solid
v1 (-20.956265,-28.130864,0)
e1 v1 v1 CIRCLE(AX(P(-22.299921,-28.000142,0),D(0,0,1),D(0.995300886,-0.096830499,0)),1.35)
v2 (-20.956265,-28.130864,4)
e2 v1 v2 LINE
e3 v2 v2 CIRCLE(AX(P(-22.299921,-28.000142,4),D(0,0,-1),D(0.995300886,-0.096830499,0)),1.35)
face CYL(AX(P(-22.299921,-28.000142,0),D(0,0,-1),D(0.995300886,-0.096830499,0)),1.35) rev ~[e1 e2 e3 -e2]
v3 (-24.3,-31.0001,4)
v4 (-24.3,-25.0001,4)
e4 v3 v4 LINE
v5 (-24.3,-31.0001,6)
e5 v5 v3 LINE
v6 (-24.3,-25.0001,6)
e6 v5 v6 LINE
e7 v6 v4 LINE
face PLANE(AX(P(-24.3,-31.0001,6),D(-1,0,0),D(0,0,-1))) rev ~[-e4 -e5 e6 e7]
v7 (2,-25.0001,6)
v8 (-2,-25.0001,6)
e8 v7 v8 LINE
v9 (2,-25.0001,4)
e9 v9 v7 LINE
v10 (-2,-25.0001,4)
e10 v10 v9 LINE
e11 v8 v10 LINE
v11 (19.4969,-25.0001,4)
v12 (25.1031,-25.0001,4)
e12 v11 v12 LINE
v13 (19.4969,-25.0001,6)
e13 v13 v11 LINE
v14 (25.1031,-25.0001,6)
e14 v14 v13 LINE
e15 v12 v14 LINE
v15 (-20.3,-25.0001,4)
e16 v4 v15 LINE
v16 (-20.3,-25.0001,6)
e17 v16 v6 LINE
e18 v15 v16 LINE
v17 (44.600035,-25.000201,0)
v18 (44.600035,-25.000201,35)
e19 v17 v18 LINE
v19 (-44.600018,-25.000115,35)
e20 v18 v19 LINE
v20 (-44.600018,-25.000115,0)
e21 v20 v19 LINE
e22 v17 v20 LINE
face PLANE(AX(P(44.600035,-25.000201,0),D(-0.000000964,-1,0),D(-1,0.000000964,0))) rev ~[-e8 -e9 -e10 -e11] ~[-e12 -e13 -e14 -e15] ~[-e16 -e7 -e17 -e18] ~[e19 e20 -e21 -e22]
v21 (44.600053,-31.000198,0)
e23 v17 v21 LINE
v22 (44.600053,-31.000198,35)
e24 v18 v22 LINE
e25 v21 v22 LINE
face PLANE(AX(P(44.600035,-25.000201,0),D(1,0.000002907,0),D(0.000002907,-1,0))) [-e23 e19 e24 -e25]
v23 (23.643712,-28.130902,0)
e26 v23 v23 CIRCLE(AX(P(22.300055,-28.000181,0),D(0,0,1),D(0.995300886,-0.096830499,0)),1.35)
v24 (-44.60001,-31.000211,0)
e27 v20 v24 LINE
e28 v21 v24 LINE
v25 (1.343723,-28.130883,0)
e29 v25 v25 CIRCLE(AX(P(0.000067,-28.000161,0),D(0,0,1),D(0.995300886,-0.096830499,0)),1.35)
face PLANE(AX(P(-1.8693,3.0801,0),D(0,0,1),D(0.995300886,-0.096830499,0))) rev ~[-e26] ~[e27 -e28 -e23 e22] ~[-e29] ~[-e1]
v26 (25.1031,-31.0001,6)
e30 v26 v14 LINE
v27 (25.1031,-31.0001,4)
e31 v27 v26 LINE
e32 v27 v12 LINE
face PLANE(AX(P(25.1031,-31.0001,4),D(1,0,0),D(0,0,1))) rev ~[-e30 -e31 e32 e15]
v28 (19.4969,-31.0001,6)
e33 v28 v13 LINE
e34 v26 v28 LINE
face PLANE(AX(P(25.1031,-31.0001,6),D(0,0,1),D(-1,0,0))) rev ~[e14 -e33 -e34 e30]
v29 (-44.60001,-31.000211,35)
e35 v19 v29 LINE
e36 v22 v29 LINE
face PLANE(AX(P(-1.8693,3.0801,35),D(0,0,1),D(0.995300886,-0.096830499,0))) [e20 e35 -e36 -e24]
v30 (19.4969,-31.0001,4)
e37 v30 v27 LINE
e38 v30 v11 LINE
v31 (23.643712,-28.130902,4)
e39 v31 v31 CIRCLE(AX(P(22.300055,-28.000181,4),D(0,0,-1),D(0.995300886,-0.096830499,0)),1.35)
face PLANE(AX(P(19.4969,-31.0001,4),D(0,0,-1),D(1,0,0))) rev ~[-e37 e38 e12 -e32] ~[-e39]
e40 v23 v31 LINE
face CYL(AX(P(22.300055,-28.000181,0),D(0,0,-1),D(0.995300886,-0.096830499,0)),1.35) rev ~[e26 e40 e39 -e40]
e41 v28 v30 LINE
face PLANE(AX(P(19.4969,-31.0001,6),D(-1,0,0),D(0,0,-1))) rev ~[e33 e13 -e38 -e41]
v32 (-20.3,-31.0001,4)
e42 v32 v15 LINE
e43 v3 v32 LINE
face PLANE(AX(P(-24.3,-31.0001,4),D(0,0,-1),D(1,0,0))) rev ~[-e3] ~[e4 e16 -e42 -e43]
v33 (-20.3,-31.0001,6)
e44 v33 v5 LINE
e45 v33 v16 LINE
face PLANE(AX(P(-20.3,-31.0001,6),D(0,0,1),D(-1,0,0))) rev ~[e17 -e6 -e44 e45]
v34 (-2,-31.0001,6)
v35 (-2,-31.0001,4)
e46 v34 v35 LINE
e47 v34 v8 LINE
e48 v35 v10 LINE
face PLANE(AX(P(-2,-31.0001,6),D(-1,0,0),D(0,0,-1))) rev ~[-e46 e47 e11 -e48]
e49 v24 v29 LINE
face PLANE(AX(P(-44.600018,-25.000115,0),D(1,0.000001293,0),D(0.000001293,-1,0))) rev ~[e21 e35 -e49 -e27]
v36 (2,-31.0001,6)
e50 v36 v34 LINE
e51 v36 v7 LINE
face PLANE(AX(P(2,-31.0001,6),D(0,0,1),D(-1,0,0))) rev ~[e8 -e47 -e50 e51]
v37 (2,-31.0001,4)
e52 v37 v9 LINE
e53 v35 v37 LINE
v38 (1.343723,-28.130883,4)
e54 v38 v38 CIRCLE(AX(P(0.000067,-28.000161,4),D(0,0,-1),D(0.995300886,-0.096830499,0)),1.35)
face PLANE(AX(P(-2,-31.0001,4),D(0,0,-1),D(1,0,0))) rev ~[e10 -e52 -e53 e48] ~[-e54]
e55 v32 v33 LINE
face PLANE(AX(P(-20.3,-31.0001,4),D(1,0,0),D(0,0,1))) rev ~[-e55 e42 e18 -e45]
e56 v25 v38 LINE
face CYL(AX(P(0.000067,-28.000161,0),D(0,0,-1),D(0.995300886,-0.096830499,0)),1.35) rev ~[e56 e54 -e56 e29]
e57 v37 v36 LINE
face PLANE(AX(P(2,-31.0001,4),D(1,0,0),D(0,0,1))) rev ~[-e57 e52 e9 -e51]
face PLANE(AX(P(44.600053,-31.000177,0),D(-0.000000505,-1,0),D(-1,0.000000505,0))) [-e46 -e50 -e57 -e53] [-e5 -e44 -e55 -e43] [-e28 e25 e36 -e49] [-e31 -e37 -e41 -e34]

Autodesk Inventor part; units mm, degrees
ref_plane "YZ Plane" through (0, 0, 0) normal (1, 0, 0) x (0, 1, 0)
ref_plane "XZ Plane" through (0, 0, 0) normal (0, 1, 0) x (-1, 0, 0)
ref_plane "XY Plane" through (0, 0, 0) normal (0, 0, 1) x (1, 0, 0)
ref_plane "작업 평면4" through (-1.8693, 3.0801, 0) normal (0, 0, 1) x (0.9953009, -0.0968305, 0)
sketch "스케치1" plane through (-1.8693, 3.0801, 0) normal (0, 0, 1) x (0.9953009, -0.0968305, 0)
  circle A0 centre (-22.7477, 22.8243) radius 1.35 projected
  circle A1 centre (-43.8827, -21.2142) radius 1.35 projected
  circle A2 centre (21.6428, 27.143) radius 1.35 projected
  circle A3 centre (4.8701, -30.7532) radius 1.35 projected
  circle A4 centre (27.0653, -28.5939) radius 1.35 projected
  circle A5 centre (-0.5524, 24.9836) radius 1.35 projected
  circle A6 centre (-46.013, 0.6824) radius 1.3956 projected
  circle A7 centre (48.7397, 9.9006) radius 1.35 projected
  circle A8 centre (-17.3251, -32.9125) radius 1.35 projected
  circle A9 centre (50.8699, -11.996) radius 1.35 projected
  line L0 (68.8179, -26.0788) -> (63.0972, 32.7232) projected
  line L1 (60.913, 34.5202) -> (-62.7034, 22.4938) projected
  line L2 (-64.5004, 20.3096) -> (-58.7796, -38.4925) projected
  line L3 (-56.5954, -40.2895) -> (67.021, -28.2631) projected
  circle A10 centre (-49.3569, -21.7468) radius 1.35 projected
  circle A11 centre (-29.5905, 2.2801) radius 1.35 projected
  circle A12 centre (-51.4871, 0.1498) radius 1.35 projected
  circle A13 centre (-27.4602, -19.6165) radius 1.35 projected
  circle A14 centre (-38.4085, -20.6817) radius 1.35 projected
  circle A15 centre (-40.5388, 1.215) radius 1.35 projected
  circle A16 centre (34.4475, -13.5937) radius 1.35 projected
  circle A17 centre (54.2138, 10.4332) radius 1.35 projected
  circle A18 centre (45.3958, -12.5285) radius 1.35 projected
  circle A19 centre (32.3172, 8.3029) radius 1.35 projected
  circle A20 centre (43.2655, 9.3681) radius 1.35 projected
  circle A21 centre (56.3441, -11.4634) radius 1.35 projected
  circle A22 centre (-22.7477, 22.8243) radius 1.35 projected
  circle A23 centre (-43.8827, -21.2142) radius 1.35 projected
  circle A24 centre (21.6428, 27.143) radius 1.35 projected
  circle A25 centre (4.8701, -30.7532) radius 1.35 projected
  circle A26 centre (27.0653, -28.5939) radius 1.35 projected
  circle A27 centre (-0.5524, 24.9836) radius 1.35 projected
  circle A28 centre (-46.013, 0.6824) radius 1.3956 projected
  circle A29 centre (48.7397, 9.9006) radius 1.35 projected
  circle A30 centre (-17.3251, -32.9125) radius 1.35 projected
  circle A31 centre (50.8699, -11.996) radius 1.35 projected
  line L4 (68.8179, -26.0788) -> (63.0972, 32.7232) projected
  line L5 (-56.5954, -40.2895) -> (67.021, -28.2631) projected
  line L6 (-64.5004, 20.3096) -> (-58.7796, -38.4925) projected
  line L7 (60.913, 34.5202) -> (-62.7034, 22.4938) projected
  circle A32 centre (-49.3569, -21.7468) radius 1.35 projected
  circle A33 centre (-29.5905, 2.2801) radius 1.35 projected
  circle A34 centre (-51.4871, 0.1498) radius 1.35 projected
  circle A35 centre (-27.4602, -19.6165) radius 1.35 projected
  circle A36 centre (-38.4085, -20.6817) radius 1.35 projected
  circle A37 centre (-40.5388, 1.215) radius 1.35 projected
  circle A38 centre (34.4475, -13.5937) radius 1.35 projected
  circle A39 centre (54.2138, 10.4332) radius 1.35 projected
  circle A40 centre (45.3958, -12.5285) radius 1.35 projected
  circle A41 centre (32.3172, 8.3029) radius 1.35 projected
  circle A42 centre (43.2655, 9.3681) radius 1.35 projected
  circle A43 centre (56.3441, -11.4634) radius 1.35 projected
  line L8 (48.97, -23.4487) -> (-39.8109, -32.0859) projected
  line L9 (-39.8109, -32.0859) -> (-39.2299, -38.0578) projected
  line L10 (55.5228, -28.8395) -> (-45.2017, -38.6387) projected
  circle A44 centre (-17.3251, -32.9125) radius 1.35 projected
  circle A45 centre (4.8701, -30.7532) radius 1.35 projected
  circle A46 centre (27.0653, -28.5939) radius 1.35 projected
  line L11 (48.97, -23.4487) -> (-39.8109, -32.0859) projected
  line L12 (48.97, -23.4487) -> (49.551, -29.4205) projected
  circle A47 centre (-26.4824, -26.5694) radius 1.6 projected
  circle A48 centre (34.8281, -20.6047) radius 1.6 projected
  circle A49 centre (-30.5105, 14.8351) radius 1.6 projected
  circle A50 centre (30.8, 20.7999) radius 1.6 projected
  circle A51 centre (-26.4824, -26.5694) radius 1.6 projected
  circle A52 centre (34.8281, -20.6047) radius 1.6 projected
  circle A53 centre (-30.5105, 14.8351) radius 1.6 projected
  circle A54 centre (30.8, 20.7999) radius 1.6 projected
  arc A55 (67.021, -28.2631) -> (68.8179, -26.0788) centre (66.8273, -26.2725) ccw projected
  arc A56 (63.0972, 32.7232) -> (60.913, 34.5202) centre (61.1066, 32.5296) ccw projected
  arc A57 (-62.7034, 22.4938) -> (-64.5004, 20.3096) centre (-62.5098, 20.5032) ccw projected
  arc A58 (-58.7796, -38.4925) -> (-56.5954, -40.2895) centre (-56.789, -38.2989) ccw projected
  arc A59 (67.021, -28.2631) -> (68.8179, -26.0788) centre (66.8273, -26.2725) ccw projected
  arc A60 (-58.7796, -38.4925) -> (-56.5954, -40.2895) centre (-56.789, -38.2989) ccw projected
  arc A61 (-62.7034, 22.4938) -> (-64.5004, 20.3096) centre (-62.5098, 20.5032) ccw projected
  arc A62 (63.0972, 32.7232) -> (60.913, 34.5202) centre (61.1066, 32.5296) ccw projected
  point P0 (2.1588, -2.8846)
  point P1 (69.0116, -28.0694)
  point P2 (62.9036, 34.7138)
  point P3 (-64.694, 22.3002)
  point P4 (-58.586, -40.4831)
extrude "돌출1" add sketch "스케치1" along normal blind 35 contours L12 L10 L9 L8
sketch "스케치2" plane through (-1.8693, 3.0801, 35) normal (0, 0, 1) x (0.9953009, -0.0968305, 0)
  circle A0 centre (-17.3251, -32.9125) radius 1.35 projected
  circle A1 centre (4.8701, -30.7532) radius 1.35 projected
  circle A2 centre (27.0653, -28.5939) radius 1.35 projected
  point P0 (2.1588, -2.8846)
extrude "돌출2" add sketch "스케치2" against normal blind 30
ref_plane "작업 평면3" through (-44.6, -31.0001, 0) normal (0, -1, 0) x (1, 0, 0)
sketch "스케치3" plane through (-44.6, -31.0001, 0) normal (0, -1, 0) x (1, 0, 0)
  line L0 (45.95, 5) -> (43.25, 5) projected
  line L1 (68.25, 5) -> (65.55, 5) projected
  line L2 (23.65, 5) -> (20.95, 5) projected
  line L3 (64.0969, 4) -> (69.7031, 4)
  line L4 (69.7031, 4) -> (69.7031, 6)
  line L5 (69.7031, 6) -> (64.0969, 6)
  line L6 (64.0969, 6) -> (64.0969, 4)
  line L7 (64.0969, 4) -> (69.7031, 6) construction
  line L8 (69.7031, 4) -> (64.0969, 6) construction
  line L9 (42.6, 4) -> (46.6, 4)
  line L10 (46.6, 4) -> (46.6, 6)
  line L11 (46.6, 6) -> (42.6, 6)
  line L12 (42.6, 6) -> (42.6, 4)
  line L13 (42.6, 4) -> (46.6, 6) construction
  line L14 (46.6, 4) -> (42.6, 6) construction
  line L15 (20.3, 4) -> (24.3, 4)
  line L16 (24.3, 4) -> (24.3, 6)
  line L17 (24.3, 6) -> (20.3, 6)
  line L18 (20.3, 6) -> (20.3, 4)
  line L19 (20.3, 4) -> (24.3, 6) construction
  line L20 (24.3, 4) -> (20.3, 6) construction
  point P0 (44.6, 0)
  point P1 (66.9, 5)
  point P2 (44.6, 5)
  point P3 (22.3, 5)
  dimension "d4" = 2
  dimension "d5" = 4
  dimension "d6" = 2
  dimension "d7" = 4
extrude "돌출4" cut sketch "스케치3" against normal up to surface (6 mm away)
properties part number "_head_adt_" material "PMMA 플라스틱"
